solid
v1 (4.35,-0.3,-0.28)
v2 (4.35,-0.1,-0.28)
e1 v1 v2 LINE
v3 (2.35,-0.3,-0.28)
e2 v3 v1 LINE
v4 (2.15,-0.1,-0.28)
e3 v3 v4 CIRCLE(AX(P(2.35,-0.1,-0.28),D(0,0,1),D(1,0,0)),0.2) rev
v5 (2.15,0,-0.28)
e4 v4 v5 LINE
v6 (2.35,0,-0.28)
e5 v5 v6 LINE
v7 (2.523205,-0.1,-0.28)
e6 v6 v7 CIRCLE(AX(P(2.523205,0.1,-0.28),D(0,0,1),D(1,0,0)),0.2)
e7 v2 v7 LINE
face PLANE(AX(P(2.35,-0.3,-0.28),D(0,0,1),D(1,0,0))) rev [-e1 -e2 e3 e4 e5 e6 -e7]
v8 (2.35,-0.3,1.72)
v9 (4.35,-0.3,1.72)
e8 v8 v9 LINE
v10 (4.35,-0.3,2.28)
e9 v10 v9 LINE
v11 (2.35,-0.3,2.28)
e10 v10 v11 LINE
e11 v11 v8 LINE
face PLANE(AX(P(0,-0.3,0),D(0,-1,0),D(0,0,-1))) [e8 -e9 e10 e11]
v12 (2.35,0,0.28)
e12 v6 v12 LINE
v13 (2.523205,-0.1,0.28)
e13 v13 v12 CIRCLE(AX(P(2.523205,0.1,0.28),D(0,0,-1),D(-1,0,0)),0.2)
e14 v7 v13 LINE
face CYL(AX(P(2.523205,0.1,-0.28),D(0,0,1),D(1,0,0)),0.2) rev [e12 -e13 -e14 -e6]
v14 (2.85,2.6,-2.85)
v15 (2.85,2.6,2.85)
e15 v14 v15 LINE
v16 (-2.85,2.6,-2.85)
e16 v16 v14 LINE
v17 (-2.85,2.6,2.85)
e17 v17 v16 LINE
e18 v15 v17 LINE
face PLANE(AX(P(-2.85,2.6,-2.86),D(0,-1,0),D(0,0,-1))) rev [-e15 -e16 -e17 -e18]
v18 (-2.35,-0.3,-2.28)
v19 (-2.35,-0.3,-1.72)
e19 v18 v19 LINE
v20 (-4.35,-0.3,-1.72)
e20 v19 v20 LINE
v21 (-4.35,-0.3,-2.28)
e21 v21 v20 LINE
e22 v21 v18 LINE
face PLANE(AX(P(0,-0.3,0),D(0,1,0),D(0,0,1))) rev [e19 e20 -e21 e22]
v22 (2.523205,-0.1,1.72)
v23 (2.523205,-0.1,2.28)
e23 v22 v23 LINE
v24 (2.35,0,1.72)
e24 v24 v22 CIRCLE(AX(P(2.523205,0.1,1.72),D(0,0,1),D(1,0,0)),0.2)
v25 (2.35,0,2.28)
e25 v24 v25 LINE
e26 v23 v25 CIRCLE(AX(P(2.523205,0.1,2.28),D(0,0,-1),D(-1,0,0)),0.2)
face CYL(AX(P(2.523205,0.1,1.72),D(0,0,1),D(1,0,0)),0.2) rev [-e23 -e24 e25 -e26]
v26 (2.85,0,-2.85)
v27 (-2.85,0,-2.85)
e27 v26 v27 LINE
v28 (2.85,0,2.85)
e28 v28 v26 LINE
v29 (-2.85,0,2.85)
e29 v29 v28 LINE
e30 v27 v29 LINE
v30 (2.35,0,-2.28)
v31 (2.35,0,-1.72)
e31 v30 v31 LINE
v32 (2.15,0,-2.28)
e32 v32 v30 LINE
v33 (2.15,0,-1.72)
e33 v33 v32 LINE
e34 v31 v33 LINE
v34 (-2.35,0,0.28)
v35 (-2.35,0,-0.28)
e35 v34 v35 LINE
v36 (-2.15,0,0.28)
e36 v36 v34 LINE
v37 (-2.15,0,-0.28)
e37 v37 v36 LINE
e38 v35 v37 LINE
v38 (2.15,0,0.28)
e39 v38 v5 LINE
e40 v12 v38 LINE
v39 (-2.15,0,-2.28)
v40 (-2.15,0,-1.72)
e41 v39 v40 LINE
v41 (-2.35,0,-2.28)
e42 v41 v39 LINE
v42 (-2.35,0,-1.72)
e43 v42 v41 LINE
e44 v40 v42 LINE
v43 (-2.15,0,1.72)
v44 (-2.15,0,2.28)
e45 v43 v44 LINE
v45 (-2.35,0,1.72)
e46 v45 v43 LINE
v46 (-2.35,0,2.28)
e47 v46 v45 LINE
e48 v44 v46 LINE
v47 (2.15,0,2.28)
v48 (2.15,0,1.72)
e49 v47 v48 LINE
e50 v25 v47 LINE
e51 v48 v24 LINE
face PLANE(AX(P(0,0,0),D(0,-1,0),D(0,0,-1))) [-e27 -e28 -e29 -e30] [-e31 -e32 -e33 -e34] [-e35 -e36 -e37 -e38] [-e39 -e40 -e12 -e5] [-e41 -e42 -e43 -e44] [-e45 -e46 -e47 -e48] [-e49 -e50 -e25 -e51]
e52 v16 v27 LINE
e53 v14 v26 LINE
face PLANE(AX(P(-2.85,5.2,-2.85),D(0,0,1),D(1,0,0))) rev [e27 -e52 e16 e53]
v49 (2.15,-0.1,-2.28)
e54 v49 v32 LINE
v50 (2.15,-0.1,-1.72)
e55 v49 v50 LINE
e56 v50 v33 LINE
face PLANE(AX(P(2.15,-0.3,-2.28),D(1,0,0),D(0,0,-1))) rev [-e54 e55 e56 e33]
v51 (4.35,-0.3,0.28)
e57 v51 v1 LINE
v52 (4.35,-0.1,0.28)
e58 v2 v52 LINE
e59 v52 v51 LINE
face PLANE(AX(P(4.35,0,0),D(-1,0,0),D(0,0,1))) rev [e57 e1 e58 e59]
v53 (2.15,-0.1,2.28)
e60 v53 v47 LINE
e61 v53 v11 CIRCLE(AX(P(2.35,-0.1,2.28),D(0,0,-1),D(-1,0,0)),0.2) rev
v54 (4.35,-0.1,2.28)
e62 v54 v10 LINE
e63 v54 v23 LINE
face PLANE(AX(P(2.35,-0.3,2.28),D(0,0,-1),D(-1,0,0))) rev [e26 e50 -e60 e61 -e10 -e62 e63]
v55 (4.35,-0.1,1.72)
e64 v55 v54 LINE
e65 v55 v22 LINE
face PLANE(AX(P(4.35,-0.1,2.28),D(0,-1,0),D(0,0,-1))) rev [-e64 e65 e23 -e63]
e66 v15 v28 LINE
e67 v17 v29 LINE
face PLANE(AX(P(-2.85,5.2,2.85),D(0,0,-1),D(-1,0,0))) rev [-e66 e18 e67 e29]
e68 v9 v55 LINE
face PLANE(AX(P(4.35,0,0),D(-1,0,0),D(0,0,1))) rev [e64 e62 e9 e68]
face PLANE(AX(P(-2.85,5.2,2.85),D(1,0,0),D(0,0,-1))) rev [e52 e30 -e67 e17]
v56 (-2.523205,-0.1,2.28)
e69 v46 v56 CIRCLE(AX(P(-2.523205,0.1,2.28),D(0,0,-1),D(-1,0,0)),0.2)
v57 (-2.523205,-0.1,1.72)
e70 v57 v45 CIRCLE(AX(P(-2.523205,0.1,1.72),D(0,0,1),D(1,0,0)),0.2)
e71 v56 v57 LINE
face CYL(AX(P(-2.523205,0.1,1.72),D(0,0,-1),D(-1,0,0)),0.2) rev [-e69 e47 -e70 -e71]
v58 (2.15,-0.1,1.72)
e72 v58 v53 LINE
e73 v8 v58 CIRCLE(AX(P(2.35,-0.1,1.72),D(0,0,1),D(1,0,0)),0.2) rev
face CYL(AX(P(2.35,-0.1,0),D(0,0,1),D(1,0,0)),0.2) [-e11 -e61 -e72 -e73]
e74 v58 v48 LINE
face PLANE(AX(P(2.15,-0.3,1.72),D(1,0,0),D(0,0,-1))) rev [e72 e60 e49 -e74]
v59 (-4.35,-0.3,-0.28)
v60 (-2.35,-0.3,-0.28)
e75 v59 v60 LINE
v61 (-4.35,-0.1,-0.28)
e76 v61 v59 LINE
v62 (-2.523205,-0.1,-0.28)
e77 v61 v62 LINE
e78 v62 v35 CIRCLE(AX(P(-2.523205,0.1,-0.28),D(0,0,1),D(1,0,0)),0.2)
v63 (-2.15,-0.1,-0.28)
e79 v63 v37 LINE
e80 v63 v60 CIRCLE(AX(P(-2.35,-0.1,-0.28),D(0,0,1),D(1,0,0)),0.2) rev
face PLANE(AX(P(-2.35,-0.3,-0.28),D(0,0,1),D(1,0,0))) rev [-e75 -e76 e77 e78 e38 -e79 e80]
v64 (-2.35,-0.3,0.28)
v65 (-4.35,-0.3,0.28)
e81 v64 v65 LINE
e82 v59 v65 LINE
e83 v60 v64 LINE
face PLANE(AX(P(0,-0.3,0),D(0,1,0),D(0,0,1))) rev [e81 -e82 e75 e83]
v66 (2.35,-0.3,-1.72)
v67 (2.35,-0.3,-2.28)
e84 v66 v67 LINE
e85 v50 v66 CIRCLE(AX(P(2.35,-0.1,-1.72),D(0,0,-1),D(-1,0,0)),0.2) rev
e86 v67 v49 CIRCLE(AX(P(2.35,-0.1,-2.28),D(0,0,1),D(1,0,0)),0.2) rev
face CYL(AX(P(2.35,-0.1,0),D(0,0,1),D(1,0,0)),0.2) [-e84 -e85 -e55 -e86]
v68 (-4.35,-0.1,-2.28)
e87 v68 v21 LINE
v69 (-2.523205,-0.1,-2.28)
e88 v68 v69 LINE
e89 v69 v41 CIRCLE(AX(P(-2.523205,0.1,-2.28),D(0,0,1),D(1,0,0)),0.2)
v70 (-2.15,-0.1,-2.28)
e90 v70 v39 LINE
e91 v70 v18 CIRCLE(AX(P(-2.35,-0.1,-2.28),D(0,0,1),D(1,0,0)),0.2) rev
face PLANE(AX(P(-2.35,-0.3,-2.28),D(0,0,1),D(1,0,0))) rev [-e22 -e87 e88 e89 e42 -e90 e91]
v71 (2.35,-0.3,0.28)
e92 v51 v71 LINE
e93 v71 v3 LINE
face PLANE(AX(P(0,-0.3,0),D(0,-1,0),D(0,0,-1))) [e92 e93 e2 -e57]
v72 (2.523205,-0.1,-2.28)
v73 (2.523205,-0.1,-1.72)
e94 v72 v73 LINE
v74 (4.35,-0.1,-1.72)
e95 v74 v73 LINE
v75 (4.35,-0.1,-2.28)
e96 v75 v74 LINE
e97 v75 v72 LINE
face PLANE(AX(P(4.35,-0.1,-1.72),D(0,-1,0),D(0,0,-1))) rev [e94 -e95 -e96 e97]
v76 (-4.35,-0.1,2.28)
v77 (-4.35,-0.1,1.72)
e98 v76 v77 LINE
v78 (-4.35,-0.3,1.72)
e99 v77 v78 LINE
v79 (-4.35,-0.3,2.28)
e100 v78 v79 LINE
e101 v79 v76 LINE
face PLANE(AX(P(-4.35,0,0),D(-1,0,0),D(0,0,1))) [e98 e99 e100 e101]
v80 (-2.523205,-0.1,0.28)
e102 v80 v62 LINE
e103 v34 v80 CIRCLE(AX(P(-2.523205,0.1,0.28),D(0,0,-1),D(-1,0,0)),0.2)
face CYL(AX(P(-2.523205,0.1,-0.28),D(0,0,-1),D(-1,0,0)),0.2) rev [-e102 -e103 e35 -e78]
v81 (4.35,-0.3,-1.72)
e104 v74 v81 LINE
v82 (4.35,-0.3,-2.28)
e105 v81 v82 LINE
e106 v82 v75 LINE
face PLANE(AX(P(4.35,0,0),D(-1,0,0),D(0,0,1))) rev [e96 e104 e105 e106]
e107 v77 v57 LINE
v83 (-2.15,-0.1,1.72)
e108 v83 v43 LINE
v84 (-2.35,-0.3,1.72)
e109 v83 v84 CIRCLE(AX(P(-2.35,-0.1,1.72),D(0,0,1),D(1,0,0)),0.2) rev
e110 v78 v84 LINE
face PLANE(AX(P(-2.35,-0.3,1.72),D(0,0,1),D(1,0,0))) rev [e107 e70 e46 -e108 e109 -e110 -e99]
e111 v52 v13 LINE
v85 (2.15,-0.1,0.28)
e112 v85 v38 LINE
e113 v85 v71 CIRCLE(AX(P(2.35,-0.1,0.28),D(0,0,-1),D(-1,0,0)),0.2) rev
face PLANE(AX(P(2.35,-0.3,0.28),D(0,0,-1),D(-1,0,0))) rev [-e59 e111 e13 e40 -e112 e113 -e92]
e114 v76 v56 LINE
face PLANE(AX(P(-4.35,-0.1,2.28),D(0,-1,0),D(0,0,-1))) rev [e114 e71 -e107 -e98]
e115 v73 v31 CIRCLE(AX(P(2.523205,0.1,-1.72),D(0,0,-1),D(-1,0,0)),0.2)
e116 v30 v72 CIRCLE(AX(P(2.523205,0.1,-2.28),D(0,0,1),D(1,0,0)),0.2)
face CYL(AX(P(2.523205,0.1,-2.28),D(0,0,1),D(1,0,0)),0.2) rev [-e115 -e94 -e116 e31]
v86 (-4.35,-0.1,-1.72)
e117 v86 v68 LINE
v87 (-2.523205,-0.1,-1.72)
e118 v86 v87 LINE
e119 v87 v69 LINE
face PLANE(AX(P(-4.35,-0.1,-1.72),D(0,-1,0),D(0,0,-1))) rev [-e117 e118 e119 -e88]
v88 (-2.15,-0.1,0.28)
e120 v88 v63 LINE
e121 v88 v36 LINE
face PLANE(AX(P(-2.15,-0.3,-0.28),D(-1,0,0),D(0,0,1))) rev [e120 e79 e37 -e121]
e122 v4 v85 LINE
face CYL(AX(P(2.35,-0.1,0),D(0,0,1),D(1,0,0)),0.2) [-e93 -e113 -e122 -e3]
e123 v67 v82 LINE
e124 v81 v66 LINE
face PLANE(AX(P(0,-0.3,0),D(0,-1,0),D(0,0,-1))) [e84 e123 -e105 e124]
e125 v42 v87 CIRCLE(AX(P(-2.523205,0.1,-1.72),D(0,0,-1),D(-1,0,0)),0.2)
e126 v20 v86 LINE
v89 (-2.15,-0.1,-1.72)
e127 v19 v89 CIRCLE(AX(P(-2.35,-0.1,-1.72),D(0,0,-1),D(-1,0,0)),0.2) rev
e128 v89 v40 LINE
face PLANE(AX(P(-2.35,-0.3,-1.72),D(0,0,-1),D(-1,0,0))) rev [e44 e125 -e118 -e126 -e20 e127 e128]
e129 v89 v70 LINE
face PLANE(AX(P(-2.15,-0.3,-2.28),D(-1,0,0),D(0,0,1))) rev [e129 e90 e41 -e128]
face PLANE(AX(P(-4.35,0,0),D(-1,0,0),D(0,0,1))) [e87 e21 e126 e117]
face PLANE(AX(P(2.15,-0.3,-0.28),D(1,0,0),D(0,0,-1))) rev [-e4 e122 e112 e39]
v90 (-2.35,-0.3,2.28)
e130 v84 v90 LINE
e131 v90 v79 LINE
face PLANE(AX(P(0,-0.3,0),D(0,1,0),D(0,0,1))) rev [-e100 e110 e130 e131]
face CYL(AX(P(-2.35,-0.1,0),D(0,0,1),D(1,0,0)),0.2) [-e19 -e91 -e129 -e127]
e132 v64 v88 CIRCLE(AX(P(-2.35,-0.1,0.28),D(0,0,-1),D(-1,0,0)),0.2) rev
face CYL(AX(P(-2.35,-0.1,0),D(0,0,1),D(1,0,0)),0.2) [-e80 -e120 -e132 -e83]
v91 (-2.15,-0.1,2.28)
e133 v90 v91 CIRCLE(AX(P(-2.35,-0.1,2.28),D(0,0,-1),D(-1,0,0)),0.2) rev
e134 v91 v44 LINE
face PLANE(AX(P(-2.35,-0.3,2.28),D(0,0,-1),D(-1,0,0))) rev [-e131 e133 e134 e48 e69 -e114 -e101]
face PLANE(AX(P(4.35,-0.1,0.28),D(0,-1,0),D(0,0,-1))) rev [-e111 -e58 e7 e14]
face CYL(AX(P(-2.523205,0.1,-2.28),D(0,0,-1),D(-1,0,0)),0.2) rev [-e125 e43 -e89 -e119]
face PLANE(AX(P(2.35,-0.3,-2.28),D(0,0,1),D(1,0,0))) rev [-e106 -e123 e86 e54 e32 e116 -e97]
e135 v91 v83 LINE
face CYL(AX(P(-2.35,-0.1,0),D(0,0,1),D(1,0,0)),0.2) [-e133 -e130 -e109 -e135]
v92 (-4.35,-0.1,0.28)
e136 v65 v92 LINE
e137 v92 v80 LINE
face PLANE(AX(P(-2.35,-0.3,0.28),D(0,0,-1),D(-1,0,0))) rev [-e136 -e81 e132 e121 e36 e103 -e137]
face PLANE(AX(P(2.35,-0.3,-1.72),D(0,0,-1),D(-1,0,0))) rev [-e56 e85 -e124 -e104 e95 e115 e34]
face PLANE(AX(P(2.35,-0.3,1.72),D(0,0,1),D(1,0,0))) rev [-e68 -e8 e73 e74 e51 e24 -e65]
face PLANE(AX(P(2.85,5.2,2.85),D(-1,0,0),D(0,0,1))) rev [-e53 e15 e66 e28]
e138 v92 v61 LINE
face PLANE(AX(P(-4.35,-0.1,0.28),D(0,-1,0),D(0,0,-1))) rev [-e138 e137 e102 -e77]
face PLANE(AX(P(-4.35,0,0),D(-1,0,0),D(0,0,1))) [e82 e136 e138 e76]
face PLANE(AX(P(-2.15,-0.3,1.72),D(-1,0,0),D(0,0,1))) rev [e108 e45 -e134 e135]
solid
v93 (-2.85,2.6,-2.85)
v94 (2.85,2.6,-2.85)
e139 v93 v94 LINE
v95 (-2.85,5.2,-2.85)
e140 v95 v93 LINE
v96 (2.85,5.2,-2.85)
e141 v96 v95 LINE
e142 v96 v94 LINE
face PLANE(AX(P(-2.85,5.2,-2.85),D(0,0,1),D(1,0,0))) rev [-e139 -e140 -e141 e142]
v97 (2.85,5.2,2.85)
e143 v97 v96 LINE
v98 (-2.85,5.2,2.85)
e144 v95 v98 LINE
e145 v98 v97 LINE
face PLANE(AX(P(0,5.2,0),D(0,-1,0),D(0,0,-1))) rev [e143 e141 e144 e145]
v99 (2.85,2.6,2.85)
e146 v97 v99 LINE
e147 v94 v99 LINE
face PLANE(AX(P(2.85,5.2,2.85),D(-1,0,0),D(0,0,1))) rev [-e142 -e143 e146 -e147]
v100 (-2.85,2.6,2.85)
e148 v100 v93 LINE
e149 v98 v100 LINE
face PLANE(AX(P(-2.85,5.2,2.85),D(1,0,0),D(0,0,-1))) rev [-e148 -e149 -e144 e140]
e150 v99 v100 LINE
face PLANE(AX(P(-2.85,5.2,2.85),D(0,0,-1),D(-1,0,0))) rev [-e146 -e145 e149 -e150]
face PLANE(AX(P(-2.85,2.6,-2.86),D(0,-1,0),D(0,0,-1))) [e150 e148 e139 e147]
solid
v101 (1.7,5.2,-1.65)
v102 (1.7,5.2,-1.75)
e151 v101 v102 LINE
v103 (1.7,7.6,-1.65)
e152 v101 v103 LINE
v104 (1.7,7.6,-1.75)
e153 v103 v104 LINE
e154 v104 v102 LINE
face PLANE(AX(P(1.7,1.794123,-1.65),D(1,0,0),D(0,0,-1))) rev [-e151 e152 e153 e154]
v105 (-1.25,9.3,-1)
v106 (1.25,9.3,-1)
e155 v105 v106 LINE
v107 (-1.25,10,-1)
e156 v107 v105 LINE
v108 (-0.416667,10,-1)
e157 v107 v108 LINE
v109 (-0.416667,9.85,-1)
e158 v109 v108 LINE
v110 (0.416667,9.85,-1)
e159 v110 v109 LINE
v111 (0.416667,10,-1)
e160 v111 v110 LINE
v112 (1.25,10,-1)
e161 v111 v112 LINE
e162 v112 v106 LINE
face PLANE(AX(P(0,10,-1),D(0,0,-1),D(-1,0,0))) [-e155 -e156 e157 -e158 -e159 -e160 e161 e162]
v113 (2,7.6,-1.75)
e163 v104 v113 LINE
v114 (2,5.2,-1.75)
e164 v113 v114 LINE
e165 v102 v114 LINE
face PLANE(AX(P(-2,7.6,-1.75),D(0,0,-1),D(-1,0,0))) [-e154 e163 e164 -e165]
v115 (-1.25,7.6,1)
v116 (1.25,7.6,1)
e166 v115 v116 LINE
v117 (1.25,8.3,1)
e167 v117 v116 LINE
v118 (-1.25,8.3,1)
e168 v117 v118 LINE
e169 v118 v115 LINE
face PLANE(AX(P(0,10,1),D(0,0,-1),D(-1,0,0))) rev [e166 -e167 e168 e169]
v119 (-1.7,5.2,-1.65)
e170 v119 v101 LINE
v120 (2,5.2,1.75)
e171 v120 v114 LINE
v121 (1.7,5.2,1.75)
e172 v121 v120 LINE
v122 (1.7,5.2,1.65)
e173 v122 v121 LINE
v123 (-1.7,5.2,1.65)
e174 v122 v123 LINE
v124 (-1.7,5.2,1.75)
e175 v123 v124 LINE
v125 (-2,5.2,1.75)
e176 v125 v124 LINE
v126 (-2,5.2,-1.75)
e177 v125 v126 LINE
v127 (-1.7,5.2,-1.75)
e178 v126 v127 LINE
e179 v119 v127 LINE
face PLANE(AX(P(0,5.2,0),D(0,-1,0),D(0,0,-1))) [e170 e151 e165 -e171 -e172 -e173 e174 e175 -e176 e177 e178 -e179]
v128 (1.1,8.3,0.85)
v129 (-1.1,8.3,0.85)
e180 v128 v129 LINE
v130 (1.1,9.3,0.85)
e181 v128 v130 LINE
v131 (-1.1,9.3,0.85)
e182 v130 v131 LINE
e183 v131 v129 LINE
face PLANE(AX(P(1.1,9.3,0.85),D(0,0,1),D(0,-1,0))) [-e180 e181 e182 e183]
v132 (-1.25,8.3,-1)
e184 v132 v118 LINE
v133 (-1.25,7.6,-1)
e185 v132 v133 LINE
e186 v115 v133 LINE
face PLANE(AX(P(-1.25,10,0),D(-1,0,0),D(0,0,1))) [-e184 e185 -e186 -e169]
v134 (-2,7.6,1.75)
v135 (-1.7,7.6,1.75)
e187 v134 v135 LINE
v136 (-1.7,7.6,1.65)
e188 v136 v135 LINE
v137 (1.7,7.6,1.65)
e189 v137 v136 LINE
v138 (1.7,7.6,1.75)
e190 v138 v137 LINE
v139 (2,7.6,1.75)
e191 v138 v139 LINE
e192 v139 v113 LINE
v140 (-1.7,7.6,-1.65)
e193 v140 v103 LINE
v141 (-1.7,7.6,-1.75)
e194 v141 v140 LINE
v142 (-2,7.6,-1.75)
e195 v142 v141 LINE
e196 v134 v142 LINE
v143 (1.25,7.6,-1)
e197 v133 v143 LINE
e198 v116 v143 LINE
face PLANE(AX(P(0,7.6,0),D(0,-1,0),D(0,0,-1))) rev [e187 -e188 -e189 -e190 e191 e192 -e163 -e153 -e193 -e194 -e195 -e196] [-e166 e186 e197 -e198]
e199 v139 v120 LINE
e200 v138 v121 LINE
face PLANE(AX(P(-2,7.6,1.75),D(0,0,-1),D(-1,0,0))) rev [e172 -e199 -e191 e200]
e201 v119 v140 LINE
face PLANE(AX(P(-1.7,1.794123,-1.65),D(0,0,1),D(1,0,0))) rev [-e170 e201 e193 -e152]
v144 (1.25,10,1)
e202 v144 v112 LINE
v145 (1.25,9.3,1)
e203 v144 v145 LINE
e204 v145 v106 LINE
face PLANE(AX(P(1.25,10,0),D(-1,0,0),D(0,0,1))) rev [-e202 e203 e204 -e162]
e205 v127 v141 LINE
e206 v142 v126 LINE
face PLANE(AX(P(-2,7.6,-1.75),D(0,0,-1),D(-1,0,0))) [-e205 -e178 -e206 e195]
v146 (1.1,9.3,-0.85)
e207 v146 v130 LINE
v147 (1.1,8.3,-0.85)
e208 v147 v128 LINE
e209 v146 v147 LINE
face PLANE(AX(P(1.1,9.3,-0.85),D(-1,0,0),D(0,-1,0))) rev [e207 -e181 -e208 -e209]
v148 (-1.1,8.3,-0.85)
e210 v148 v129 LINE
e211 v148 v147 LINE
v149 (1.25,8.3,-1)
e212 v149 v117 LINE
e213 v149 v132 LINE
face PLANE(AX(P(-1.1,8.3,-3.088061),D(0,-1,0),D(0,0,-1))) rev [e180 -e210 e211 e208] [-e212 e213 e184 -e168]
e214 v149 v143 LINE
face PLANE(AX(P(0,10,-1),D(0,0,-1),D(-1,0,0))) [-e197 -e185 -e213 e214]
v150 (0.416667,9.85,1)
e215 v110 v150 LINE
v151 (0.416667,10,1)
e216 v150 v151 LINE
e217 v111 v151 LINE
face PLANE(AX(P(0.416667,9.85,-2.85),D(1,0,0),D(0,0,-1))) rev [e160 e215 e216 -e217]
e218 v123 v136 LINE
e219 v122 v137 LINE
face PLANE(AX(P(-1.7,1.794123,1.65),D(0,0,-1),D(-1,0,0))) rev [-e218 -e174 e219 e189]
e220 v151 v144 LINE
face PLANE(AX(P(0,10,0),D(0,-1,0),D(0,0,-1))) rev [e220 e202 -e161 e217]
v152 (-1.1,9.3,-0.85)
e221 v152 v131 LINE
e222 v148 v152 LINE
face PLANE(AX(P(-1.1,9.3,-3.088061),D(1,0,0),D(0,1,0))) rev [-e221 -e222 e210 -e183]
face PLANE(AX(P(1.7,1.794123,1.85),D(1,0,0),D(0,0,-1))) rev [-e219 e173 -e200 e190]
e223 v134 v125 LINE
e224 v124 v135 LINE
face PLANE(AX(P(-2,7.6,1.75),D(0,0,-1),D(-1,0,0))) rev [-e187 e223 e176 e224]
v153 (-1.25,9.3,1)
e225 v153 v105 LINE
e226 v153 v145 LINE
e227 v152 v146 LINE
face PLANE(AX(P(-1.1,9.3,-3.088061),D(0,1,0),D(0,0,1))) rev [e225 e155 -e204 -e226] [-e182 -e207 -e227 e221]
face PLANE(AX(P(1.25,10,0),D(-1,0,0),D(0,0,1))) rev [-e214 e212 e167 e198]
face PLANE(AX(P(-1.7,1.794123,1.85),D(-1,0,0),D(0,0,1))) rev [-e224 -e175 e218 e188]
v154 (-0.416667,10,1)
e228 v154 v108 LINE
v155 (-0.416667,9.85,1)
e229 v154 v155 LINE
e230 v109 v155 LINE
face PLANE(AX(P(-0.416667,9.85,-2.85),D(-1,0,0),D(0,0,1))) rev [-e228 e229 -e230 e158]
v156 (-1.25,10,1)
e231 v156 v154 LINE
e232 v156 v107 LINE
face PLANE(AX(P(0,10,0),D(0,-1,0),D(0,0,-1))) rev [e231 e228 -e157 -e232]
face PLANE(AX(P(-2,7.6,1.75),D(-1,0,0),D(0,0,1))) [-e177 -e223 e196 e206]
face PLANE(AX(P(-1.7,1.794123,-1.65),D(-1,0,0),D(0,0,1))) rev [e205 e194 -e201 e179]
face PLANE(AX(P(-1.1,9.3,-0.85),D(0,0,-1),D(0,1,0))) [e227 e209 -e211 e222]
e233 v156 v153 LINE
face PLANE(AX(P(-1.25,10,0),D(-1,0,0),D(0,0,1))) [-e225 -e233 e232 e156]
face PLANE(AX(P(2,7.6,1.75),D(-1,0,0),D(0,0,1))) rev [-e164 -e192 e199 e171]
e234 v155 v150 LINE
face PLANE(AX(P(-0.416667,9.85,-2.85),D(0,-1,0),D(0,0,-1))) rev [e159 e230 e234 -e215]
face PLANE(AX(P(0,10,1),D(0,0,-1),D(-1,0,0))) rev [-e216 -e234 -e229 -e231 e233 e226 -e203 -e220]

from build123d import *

# Parameters (mm, degrees)
SKETCH_1_W                     = 5.7
SKETCH_1_H                     = 5.7
EXTRUDE_1_DEPTH                = 5.2
SPLIT_BODIES_1_SURFACE_1_BACK  = 10.593
SPLIT_BODIES_1_SURFACE_1_DEPTH = 21.186
SPLIT_BODIES_1_SURFACE_2_BACK  = 10.593
SPLIT_BODIES_1_SURFACE_2_DEPTH = 21.186
SKETCH_3_W                     = 4
SKETCH_3_H                     = 3.5
EXTRUDE_2_DEPTH                = 2.4
EXTRUDE_START                  = 2.4
SKETCH_3_3_W                   = 2.5
SKETCH_3_3_H                   = 2
EXTRUDE_3_DEPTH                = 2.4
SKETCH_4_W                     = 0.833333334
SKETCH_4_H                     = 0.3
CUT_EXTRUDE_1_DEPTH            = 12.088056638
SWEEP_START                    = 8.3
SWEEP_1_OUTLINE_W              = 2.5
SWEEP_1_OUTLINE_H              = 2
SWEEP_1_OUTLINE_W_2            = 2.2
SWEEP_1_OUTLINE_H_2            = 1.7
SWEEP_1_DEPTH                  = 1
SKETCH_10_W                    = 3.4
SKETCH_10_H                    = 0.2
CUT_EXTRUDE_2_DEPTH            = 2.4
SKETCH_14_W                    = 0.2
SKETCH_14_H                    = 0.56
EXTRUDE_5_DEPTH                = 0.3
SKETCH_15_W                    = 0.56
SKETCH_15_H                    = 0.2
EXTRUDE_6_DEPTH                = 2
SKETCH_16_W                    = 0.56
SKETCH_16_H                    = 0.2
EXTRUDE_7_DEPTH                = 2
FILLET_1_R                     = 0.2


with BuildPart() as part:
    # Эскиз1 → Бобышка-Вытянуть1 (new body)
    with BuildSketch(Plane(origin=(0, 0, 0), x_dir=(1, 0, 0), z_dir=(0, 1, 0))):
        Rectangle(SKETCH_1_W, SKETCH_1_H)
    extrude(amount=EXTRUDE_1_DEPTH)


with BuildPart() as body_2:
    # Split Bodies 1: the piece behind the surface
    add(part.part)
    # Split Bodies 1 surface: a surface, the sketch's curves swept straight by 21.186 mm
    with BuildLine(Plane.XY.offset(2.85).offset(-SPLIT_BODIES_1_SURFACE_1_BACK), mode=Mode.PRIVATE) as split_bodies_1_surface_1_path:
        Line((-2.85, 2.6), (2.85, 2.6))
    split_bodies_1_surface_1 = Shell.extrude(split_bodies_1_surface_1_path.wire(), (0 * SPLIT_BODIES_1_SURFACE_1_DEPTH, 0 * SPLIT_BODIES_1_SURFACE_1_DEPTH, 1 * SPLIT_BODIES_1_SURFACE_1_DEPTH))
    split(bisect_by=split_bodies_1_surface_1, keep=Keep.BOTTOM)

    # Эскиз14 → Бобышка-Вытянуть5 (add)
    with BuildSketch(Plane.XZ):
        with Locations((-2.25, 0)):
            Rectangle(SKETCH_14_W, SKETCH_14_H)
        with Locations((-2.25, 2)):
            Rectangle(SKETCH_14_W, SKETCH_14_H)
        with Locations((-2.25, -2)):
            Rectangle(SKETCH_14_W, SKETCH_14_H)
        with Locations((2.25, -2)):
            Rectangle(SKETCH_14_W, SKETCH_14_H)
        with Locations((2.25, 2)):
            Rectangle(SKETCH_14_W, SKETCH_14_H)
        with Locations((2.25, 0)):
            Rectangle(SKETCH_14_W, SKETCH_14_H)
    extrude(amount=EXTRUDE_5_DEPTH)

    # Эскиз15 → Бобышка-Вытянуть6 (add)
    with BuildSketch(Plane(origin=(2.35, 0, 0), x_dir=(0, 0, -1), z_dir=(1, 0, 0))):
        with Locations((-2, -0.2)):
            Rectangle(SKETCH_15_W, SKETCH_15_H)
        with Locations((0, -0.2)):
            Rectangle(SKETCH_15_W, SKETCH_15_H)
        with Locations((2, -0.2)):
            Rectangle(SKETCH_15_W, SKETCH_15_H)
    extrude(amount=EXTRUDE_6_DEPTH)

    # Эскиз16 → Бобышка-Вытянуть7 (add)
    with BuildSketch(Plane.ZY.offset(2.35)):
        with Locations((2, -0.2)):
            Rectangle(SKETCH_16_W, SKETCH_16_H)
        with Locations((0, -0.2)):
            Rectangle(SKETCH_16_W, SKETCH_16_H)
        with Locations((-2, -0.2)):
            Rectangle(SKETCH_16_W, SKETCH_16_H)
    extrude(amount=EXTRUDE_7_DEPTH)

    # Скругление1
    # the kernel refuses this fillet: 0.2 mm, written as the material it adds along each edge
    with BuildSketch(Plane(origin=(2.35, -0.1, -2.28), x_dir=(1, 0, 0), z_dir=(0, 0, 1)), Plane(origin=(2.35, -0.1, -0.28), x_dir=(1, 0, 0), z_dir=(0, 0, 1))) as fillet_1_piece_1:
        with BuildLine():
            CenterArc((0.173205081, 0.2), FILLET_1_R, 210, 60)
            Line((0, 0.1), (0, 0))
            Line((0, 0), (0.173205081, 0))
        make_face()
    extrude(amount=0.56)
    with BuildSketch(Plane(origin=(2.35, -0.1, 1.72), x_dir=(0, 1, 0), z_dir=(0, 0, 1))) as fillet_1_piece_2:
        with BuildLine():
            CenterArc((0.2, -0.173205081), FILLET_1_R, 120, 60)
            Line((0, -0.173205081), (0, 0))
            Line((0, 0), (0.1, 0))
        make_face()
    extrude(amount=0.56)
    with BuildSketch(Plane(origin=(-2.35, -0.1, -2.28), x_dir=(-1, 0, 0), z_dir=(0, 0, 1)), Plane(origin=(-2.35, -0.1, -0.28), x_dir=(-1, 0, 0), z_dir=(0, 0, 1))) as fillet_1_piece_3:
        with BuildLine():
            CenterArc((0.173205081, -0.2), FILLET_1_R, 90, 60)
            Line((0, -0.1), (0, 0))
            Line((0, 0), (0.173205081, 0))
        make_face()
    extrude(amount=0.56)
    with BuildSketch(Plane(origin=(-2.35, -0.1, 1.72), x_dir=(0, 1, 0), z_dir=(0, 0, 1))) as fillet_1_piece_4:
        with BuildLine():
            CenterArc((0.2, 0.173205081), FILLET_1_R, 180, 60)
            Line((0, 0.173205081), (0, 0))
            Line((0, 0), (0.1, 0))
        make_face()
    extrude(amount=0.56)
    # the kernel refuses this fillet: 0.2 mm, written as the material it takes off along each edge
    with BuildSketch(Plane(origin=(2.15, -0.3, 1.22), x_dir=(0, 1, 0), z_dir=(0, 0, 1)), Plane(origin=(2.15, -0.3, -0.78), x_dir=(0, 1, 0), z_dir=(0, 0, 1)), Plane(origin=(2.15, -0.3, -2.78), x_dir=(0, 1, 0), z_dir=(0, 0, 1)), Plane(origin=(-2.15, -0.3, 2.78), x_dir=(0, 1, 0), z_dir=(0, 0, -1))) as fillet_1_2_piece_1:
        with BuildLine():
            CenterArc((FILLET_1_R, -FILLET_1_R), FILLET_1_R, 90, 90)
            Line((0, -FILLET_1_R), (0, 0))
            Line((0, 0), (FILLET_1_R, 0))
        make_face()
    extrude(amount=1.56, mode=Mode.SUBTRACT)
    with BuildSketch(Plane(origin=(-2.15, -0.3, -2.78), x_dir=(0, 1, 0), z_dir=(0, 0, 1)), Plane(origin=(-2.15, -0.3, -0.78), x_dir=(0, 1, 0), z_dir=(0, 0, 1))) as fillet_1_2_piece_2:
        with BuildLine():
            CenterArc((FILLET_1_R, FILLET_1_R), FILLET_1_R, 180, 90)
            Line((0, FILLET_1_R), (0, 0))
            Line((0, 0), (FILLET_1_R, 0))
        make_face()
    extrude(amount=1.56, mode=Mode.SUBTRACT)


with BuildPart() as part_1:
    add(part.part)

    # Split Bodies 1: split by a surface, the side it looks to stays
    # Split Bodies 1 surface: a surface, the sketch's curves swept straight by 21.186 mm
    with BuildLine(Plane.XY.offset(2.85).offset(-SPLIT_BODIES_1_SURFACE_2_BACK), mode=Mode.PRIVATE) as split_bodies_1_surface_2_path:
        Line((-2.85, 2.6), (2.85, 2.6))
    split_bodies_1_surface_2 = Shell.extrude(split_bodies_1_surface_2_path.wire(), (0 * SPLIT_BODIES_1_SURFACE_2_DEPTH, 0 * SPLIT_BODIES_1_SURFACE_2_DEPTH, 1 * SPLIT_BODIES_1_SURFACE_2_DEPTH))
    split(bisect_by=split_bodies_1_surface_2, keep=Keep.TOP)


with BuildPart() as body_3:
    # Эскиз3 → Бобышка-Вытянуть2 (new body)
    with BuildSketch(Plane(origin=(0, 5.2, 0), x_dir=(1, 0, 0), z_dir=(0, 1, 0))):
        Rectangle(SKETCH_3_W, SKETCH_3_H)
    extrude(amount=EXTRUDE_2_DEPTH)

    # Эскиз3<3> → Бобышка-Вытянуть3 (add)
    with BuildSketch(Plane(origin=(0, 5.2, 0), x_dir=(1, 0, 0), z_dir=(0, 1, 0)).offset(EXTRUDE_START)):
        Rectangle(SKETCH_3_3_W, SKETCH_3_3_H)
    extrude(amount=EXTRUDE_3_DEPTH)

    # Эскиз4 → Вырез-Вытянуть1 (cut, through all)
    with BuildSketch(Plane.XY.offset(1)):
        with Locations((0, 10)):
            Rectangle(SKETCH_4_W, SKETCH_4_H)
    extrude(amount=-CUT_EXTRUDE_1_DEPTH, mode=Mode.SUBTRACT)

    # Вырез-По траектории1: read off the stored shape, not the designer's step
    # Вырез-По траектории1 outline → Вырез-По траектории1 (cut)
    with BuildSketch(Plane(origin=(0, 0, 0), x_dir=(1, 0, 0), z_dir=(0, 1, 0)).offset(SWEEP_START)):
        Rectangle(SWEEP_1_OUTLINE_W, SWEEP_1_OUTLINE_H)
        Rectangle(SWEEP_1_OUTLINE_W_2, SWEEP_1_OUTLINE_H_2, mode=Mode.SUBTRACT)
    extrude(amount=SWEEP_1_DEPTH, mode=Mode.SUBTRACT)

    # Эскиз10 → Вырез-Вытянуть2 (cut)
    with BuildSketch(Plane(origin=(0, 7.6, 0), x_dir=(1, 0, 0), z_dir=(0, 1, 0))):
        with Locations((0, -1.75)):
            Rectangle(SKETCH_10_W, SKETCH_10_H)
        with Locations((0, 1.75)):
            Rectangle(SKETCH_10_W, SKETCH_10_H)
    extrude(amount=-CUT_EXTRUDE_2_DEPTH, mode=Mode.SUBTRACT)


solid = Compound([body_2.part, part_1.part, body_3.part])
